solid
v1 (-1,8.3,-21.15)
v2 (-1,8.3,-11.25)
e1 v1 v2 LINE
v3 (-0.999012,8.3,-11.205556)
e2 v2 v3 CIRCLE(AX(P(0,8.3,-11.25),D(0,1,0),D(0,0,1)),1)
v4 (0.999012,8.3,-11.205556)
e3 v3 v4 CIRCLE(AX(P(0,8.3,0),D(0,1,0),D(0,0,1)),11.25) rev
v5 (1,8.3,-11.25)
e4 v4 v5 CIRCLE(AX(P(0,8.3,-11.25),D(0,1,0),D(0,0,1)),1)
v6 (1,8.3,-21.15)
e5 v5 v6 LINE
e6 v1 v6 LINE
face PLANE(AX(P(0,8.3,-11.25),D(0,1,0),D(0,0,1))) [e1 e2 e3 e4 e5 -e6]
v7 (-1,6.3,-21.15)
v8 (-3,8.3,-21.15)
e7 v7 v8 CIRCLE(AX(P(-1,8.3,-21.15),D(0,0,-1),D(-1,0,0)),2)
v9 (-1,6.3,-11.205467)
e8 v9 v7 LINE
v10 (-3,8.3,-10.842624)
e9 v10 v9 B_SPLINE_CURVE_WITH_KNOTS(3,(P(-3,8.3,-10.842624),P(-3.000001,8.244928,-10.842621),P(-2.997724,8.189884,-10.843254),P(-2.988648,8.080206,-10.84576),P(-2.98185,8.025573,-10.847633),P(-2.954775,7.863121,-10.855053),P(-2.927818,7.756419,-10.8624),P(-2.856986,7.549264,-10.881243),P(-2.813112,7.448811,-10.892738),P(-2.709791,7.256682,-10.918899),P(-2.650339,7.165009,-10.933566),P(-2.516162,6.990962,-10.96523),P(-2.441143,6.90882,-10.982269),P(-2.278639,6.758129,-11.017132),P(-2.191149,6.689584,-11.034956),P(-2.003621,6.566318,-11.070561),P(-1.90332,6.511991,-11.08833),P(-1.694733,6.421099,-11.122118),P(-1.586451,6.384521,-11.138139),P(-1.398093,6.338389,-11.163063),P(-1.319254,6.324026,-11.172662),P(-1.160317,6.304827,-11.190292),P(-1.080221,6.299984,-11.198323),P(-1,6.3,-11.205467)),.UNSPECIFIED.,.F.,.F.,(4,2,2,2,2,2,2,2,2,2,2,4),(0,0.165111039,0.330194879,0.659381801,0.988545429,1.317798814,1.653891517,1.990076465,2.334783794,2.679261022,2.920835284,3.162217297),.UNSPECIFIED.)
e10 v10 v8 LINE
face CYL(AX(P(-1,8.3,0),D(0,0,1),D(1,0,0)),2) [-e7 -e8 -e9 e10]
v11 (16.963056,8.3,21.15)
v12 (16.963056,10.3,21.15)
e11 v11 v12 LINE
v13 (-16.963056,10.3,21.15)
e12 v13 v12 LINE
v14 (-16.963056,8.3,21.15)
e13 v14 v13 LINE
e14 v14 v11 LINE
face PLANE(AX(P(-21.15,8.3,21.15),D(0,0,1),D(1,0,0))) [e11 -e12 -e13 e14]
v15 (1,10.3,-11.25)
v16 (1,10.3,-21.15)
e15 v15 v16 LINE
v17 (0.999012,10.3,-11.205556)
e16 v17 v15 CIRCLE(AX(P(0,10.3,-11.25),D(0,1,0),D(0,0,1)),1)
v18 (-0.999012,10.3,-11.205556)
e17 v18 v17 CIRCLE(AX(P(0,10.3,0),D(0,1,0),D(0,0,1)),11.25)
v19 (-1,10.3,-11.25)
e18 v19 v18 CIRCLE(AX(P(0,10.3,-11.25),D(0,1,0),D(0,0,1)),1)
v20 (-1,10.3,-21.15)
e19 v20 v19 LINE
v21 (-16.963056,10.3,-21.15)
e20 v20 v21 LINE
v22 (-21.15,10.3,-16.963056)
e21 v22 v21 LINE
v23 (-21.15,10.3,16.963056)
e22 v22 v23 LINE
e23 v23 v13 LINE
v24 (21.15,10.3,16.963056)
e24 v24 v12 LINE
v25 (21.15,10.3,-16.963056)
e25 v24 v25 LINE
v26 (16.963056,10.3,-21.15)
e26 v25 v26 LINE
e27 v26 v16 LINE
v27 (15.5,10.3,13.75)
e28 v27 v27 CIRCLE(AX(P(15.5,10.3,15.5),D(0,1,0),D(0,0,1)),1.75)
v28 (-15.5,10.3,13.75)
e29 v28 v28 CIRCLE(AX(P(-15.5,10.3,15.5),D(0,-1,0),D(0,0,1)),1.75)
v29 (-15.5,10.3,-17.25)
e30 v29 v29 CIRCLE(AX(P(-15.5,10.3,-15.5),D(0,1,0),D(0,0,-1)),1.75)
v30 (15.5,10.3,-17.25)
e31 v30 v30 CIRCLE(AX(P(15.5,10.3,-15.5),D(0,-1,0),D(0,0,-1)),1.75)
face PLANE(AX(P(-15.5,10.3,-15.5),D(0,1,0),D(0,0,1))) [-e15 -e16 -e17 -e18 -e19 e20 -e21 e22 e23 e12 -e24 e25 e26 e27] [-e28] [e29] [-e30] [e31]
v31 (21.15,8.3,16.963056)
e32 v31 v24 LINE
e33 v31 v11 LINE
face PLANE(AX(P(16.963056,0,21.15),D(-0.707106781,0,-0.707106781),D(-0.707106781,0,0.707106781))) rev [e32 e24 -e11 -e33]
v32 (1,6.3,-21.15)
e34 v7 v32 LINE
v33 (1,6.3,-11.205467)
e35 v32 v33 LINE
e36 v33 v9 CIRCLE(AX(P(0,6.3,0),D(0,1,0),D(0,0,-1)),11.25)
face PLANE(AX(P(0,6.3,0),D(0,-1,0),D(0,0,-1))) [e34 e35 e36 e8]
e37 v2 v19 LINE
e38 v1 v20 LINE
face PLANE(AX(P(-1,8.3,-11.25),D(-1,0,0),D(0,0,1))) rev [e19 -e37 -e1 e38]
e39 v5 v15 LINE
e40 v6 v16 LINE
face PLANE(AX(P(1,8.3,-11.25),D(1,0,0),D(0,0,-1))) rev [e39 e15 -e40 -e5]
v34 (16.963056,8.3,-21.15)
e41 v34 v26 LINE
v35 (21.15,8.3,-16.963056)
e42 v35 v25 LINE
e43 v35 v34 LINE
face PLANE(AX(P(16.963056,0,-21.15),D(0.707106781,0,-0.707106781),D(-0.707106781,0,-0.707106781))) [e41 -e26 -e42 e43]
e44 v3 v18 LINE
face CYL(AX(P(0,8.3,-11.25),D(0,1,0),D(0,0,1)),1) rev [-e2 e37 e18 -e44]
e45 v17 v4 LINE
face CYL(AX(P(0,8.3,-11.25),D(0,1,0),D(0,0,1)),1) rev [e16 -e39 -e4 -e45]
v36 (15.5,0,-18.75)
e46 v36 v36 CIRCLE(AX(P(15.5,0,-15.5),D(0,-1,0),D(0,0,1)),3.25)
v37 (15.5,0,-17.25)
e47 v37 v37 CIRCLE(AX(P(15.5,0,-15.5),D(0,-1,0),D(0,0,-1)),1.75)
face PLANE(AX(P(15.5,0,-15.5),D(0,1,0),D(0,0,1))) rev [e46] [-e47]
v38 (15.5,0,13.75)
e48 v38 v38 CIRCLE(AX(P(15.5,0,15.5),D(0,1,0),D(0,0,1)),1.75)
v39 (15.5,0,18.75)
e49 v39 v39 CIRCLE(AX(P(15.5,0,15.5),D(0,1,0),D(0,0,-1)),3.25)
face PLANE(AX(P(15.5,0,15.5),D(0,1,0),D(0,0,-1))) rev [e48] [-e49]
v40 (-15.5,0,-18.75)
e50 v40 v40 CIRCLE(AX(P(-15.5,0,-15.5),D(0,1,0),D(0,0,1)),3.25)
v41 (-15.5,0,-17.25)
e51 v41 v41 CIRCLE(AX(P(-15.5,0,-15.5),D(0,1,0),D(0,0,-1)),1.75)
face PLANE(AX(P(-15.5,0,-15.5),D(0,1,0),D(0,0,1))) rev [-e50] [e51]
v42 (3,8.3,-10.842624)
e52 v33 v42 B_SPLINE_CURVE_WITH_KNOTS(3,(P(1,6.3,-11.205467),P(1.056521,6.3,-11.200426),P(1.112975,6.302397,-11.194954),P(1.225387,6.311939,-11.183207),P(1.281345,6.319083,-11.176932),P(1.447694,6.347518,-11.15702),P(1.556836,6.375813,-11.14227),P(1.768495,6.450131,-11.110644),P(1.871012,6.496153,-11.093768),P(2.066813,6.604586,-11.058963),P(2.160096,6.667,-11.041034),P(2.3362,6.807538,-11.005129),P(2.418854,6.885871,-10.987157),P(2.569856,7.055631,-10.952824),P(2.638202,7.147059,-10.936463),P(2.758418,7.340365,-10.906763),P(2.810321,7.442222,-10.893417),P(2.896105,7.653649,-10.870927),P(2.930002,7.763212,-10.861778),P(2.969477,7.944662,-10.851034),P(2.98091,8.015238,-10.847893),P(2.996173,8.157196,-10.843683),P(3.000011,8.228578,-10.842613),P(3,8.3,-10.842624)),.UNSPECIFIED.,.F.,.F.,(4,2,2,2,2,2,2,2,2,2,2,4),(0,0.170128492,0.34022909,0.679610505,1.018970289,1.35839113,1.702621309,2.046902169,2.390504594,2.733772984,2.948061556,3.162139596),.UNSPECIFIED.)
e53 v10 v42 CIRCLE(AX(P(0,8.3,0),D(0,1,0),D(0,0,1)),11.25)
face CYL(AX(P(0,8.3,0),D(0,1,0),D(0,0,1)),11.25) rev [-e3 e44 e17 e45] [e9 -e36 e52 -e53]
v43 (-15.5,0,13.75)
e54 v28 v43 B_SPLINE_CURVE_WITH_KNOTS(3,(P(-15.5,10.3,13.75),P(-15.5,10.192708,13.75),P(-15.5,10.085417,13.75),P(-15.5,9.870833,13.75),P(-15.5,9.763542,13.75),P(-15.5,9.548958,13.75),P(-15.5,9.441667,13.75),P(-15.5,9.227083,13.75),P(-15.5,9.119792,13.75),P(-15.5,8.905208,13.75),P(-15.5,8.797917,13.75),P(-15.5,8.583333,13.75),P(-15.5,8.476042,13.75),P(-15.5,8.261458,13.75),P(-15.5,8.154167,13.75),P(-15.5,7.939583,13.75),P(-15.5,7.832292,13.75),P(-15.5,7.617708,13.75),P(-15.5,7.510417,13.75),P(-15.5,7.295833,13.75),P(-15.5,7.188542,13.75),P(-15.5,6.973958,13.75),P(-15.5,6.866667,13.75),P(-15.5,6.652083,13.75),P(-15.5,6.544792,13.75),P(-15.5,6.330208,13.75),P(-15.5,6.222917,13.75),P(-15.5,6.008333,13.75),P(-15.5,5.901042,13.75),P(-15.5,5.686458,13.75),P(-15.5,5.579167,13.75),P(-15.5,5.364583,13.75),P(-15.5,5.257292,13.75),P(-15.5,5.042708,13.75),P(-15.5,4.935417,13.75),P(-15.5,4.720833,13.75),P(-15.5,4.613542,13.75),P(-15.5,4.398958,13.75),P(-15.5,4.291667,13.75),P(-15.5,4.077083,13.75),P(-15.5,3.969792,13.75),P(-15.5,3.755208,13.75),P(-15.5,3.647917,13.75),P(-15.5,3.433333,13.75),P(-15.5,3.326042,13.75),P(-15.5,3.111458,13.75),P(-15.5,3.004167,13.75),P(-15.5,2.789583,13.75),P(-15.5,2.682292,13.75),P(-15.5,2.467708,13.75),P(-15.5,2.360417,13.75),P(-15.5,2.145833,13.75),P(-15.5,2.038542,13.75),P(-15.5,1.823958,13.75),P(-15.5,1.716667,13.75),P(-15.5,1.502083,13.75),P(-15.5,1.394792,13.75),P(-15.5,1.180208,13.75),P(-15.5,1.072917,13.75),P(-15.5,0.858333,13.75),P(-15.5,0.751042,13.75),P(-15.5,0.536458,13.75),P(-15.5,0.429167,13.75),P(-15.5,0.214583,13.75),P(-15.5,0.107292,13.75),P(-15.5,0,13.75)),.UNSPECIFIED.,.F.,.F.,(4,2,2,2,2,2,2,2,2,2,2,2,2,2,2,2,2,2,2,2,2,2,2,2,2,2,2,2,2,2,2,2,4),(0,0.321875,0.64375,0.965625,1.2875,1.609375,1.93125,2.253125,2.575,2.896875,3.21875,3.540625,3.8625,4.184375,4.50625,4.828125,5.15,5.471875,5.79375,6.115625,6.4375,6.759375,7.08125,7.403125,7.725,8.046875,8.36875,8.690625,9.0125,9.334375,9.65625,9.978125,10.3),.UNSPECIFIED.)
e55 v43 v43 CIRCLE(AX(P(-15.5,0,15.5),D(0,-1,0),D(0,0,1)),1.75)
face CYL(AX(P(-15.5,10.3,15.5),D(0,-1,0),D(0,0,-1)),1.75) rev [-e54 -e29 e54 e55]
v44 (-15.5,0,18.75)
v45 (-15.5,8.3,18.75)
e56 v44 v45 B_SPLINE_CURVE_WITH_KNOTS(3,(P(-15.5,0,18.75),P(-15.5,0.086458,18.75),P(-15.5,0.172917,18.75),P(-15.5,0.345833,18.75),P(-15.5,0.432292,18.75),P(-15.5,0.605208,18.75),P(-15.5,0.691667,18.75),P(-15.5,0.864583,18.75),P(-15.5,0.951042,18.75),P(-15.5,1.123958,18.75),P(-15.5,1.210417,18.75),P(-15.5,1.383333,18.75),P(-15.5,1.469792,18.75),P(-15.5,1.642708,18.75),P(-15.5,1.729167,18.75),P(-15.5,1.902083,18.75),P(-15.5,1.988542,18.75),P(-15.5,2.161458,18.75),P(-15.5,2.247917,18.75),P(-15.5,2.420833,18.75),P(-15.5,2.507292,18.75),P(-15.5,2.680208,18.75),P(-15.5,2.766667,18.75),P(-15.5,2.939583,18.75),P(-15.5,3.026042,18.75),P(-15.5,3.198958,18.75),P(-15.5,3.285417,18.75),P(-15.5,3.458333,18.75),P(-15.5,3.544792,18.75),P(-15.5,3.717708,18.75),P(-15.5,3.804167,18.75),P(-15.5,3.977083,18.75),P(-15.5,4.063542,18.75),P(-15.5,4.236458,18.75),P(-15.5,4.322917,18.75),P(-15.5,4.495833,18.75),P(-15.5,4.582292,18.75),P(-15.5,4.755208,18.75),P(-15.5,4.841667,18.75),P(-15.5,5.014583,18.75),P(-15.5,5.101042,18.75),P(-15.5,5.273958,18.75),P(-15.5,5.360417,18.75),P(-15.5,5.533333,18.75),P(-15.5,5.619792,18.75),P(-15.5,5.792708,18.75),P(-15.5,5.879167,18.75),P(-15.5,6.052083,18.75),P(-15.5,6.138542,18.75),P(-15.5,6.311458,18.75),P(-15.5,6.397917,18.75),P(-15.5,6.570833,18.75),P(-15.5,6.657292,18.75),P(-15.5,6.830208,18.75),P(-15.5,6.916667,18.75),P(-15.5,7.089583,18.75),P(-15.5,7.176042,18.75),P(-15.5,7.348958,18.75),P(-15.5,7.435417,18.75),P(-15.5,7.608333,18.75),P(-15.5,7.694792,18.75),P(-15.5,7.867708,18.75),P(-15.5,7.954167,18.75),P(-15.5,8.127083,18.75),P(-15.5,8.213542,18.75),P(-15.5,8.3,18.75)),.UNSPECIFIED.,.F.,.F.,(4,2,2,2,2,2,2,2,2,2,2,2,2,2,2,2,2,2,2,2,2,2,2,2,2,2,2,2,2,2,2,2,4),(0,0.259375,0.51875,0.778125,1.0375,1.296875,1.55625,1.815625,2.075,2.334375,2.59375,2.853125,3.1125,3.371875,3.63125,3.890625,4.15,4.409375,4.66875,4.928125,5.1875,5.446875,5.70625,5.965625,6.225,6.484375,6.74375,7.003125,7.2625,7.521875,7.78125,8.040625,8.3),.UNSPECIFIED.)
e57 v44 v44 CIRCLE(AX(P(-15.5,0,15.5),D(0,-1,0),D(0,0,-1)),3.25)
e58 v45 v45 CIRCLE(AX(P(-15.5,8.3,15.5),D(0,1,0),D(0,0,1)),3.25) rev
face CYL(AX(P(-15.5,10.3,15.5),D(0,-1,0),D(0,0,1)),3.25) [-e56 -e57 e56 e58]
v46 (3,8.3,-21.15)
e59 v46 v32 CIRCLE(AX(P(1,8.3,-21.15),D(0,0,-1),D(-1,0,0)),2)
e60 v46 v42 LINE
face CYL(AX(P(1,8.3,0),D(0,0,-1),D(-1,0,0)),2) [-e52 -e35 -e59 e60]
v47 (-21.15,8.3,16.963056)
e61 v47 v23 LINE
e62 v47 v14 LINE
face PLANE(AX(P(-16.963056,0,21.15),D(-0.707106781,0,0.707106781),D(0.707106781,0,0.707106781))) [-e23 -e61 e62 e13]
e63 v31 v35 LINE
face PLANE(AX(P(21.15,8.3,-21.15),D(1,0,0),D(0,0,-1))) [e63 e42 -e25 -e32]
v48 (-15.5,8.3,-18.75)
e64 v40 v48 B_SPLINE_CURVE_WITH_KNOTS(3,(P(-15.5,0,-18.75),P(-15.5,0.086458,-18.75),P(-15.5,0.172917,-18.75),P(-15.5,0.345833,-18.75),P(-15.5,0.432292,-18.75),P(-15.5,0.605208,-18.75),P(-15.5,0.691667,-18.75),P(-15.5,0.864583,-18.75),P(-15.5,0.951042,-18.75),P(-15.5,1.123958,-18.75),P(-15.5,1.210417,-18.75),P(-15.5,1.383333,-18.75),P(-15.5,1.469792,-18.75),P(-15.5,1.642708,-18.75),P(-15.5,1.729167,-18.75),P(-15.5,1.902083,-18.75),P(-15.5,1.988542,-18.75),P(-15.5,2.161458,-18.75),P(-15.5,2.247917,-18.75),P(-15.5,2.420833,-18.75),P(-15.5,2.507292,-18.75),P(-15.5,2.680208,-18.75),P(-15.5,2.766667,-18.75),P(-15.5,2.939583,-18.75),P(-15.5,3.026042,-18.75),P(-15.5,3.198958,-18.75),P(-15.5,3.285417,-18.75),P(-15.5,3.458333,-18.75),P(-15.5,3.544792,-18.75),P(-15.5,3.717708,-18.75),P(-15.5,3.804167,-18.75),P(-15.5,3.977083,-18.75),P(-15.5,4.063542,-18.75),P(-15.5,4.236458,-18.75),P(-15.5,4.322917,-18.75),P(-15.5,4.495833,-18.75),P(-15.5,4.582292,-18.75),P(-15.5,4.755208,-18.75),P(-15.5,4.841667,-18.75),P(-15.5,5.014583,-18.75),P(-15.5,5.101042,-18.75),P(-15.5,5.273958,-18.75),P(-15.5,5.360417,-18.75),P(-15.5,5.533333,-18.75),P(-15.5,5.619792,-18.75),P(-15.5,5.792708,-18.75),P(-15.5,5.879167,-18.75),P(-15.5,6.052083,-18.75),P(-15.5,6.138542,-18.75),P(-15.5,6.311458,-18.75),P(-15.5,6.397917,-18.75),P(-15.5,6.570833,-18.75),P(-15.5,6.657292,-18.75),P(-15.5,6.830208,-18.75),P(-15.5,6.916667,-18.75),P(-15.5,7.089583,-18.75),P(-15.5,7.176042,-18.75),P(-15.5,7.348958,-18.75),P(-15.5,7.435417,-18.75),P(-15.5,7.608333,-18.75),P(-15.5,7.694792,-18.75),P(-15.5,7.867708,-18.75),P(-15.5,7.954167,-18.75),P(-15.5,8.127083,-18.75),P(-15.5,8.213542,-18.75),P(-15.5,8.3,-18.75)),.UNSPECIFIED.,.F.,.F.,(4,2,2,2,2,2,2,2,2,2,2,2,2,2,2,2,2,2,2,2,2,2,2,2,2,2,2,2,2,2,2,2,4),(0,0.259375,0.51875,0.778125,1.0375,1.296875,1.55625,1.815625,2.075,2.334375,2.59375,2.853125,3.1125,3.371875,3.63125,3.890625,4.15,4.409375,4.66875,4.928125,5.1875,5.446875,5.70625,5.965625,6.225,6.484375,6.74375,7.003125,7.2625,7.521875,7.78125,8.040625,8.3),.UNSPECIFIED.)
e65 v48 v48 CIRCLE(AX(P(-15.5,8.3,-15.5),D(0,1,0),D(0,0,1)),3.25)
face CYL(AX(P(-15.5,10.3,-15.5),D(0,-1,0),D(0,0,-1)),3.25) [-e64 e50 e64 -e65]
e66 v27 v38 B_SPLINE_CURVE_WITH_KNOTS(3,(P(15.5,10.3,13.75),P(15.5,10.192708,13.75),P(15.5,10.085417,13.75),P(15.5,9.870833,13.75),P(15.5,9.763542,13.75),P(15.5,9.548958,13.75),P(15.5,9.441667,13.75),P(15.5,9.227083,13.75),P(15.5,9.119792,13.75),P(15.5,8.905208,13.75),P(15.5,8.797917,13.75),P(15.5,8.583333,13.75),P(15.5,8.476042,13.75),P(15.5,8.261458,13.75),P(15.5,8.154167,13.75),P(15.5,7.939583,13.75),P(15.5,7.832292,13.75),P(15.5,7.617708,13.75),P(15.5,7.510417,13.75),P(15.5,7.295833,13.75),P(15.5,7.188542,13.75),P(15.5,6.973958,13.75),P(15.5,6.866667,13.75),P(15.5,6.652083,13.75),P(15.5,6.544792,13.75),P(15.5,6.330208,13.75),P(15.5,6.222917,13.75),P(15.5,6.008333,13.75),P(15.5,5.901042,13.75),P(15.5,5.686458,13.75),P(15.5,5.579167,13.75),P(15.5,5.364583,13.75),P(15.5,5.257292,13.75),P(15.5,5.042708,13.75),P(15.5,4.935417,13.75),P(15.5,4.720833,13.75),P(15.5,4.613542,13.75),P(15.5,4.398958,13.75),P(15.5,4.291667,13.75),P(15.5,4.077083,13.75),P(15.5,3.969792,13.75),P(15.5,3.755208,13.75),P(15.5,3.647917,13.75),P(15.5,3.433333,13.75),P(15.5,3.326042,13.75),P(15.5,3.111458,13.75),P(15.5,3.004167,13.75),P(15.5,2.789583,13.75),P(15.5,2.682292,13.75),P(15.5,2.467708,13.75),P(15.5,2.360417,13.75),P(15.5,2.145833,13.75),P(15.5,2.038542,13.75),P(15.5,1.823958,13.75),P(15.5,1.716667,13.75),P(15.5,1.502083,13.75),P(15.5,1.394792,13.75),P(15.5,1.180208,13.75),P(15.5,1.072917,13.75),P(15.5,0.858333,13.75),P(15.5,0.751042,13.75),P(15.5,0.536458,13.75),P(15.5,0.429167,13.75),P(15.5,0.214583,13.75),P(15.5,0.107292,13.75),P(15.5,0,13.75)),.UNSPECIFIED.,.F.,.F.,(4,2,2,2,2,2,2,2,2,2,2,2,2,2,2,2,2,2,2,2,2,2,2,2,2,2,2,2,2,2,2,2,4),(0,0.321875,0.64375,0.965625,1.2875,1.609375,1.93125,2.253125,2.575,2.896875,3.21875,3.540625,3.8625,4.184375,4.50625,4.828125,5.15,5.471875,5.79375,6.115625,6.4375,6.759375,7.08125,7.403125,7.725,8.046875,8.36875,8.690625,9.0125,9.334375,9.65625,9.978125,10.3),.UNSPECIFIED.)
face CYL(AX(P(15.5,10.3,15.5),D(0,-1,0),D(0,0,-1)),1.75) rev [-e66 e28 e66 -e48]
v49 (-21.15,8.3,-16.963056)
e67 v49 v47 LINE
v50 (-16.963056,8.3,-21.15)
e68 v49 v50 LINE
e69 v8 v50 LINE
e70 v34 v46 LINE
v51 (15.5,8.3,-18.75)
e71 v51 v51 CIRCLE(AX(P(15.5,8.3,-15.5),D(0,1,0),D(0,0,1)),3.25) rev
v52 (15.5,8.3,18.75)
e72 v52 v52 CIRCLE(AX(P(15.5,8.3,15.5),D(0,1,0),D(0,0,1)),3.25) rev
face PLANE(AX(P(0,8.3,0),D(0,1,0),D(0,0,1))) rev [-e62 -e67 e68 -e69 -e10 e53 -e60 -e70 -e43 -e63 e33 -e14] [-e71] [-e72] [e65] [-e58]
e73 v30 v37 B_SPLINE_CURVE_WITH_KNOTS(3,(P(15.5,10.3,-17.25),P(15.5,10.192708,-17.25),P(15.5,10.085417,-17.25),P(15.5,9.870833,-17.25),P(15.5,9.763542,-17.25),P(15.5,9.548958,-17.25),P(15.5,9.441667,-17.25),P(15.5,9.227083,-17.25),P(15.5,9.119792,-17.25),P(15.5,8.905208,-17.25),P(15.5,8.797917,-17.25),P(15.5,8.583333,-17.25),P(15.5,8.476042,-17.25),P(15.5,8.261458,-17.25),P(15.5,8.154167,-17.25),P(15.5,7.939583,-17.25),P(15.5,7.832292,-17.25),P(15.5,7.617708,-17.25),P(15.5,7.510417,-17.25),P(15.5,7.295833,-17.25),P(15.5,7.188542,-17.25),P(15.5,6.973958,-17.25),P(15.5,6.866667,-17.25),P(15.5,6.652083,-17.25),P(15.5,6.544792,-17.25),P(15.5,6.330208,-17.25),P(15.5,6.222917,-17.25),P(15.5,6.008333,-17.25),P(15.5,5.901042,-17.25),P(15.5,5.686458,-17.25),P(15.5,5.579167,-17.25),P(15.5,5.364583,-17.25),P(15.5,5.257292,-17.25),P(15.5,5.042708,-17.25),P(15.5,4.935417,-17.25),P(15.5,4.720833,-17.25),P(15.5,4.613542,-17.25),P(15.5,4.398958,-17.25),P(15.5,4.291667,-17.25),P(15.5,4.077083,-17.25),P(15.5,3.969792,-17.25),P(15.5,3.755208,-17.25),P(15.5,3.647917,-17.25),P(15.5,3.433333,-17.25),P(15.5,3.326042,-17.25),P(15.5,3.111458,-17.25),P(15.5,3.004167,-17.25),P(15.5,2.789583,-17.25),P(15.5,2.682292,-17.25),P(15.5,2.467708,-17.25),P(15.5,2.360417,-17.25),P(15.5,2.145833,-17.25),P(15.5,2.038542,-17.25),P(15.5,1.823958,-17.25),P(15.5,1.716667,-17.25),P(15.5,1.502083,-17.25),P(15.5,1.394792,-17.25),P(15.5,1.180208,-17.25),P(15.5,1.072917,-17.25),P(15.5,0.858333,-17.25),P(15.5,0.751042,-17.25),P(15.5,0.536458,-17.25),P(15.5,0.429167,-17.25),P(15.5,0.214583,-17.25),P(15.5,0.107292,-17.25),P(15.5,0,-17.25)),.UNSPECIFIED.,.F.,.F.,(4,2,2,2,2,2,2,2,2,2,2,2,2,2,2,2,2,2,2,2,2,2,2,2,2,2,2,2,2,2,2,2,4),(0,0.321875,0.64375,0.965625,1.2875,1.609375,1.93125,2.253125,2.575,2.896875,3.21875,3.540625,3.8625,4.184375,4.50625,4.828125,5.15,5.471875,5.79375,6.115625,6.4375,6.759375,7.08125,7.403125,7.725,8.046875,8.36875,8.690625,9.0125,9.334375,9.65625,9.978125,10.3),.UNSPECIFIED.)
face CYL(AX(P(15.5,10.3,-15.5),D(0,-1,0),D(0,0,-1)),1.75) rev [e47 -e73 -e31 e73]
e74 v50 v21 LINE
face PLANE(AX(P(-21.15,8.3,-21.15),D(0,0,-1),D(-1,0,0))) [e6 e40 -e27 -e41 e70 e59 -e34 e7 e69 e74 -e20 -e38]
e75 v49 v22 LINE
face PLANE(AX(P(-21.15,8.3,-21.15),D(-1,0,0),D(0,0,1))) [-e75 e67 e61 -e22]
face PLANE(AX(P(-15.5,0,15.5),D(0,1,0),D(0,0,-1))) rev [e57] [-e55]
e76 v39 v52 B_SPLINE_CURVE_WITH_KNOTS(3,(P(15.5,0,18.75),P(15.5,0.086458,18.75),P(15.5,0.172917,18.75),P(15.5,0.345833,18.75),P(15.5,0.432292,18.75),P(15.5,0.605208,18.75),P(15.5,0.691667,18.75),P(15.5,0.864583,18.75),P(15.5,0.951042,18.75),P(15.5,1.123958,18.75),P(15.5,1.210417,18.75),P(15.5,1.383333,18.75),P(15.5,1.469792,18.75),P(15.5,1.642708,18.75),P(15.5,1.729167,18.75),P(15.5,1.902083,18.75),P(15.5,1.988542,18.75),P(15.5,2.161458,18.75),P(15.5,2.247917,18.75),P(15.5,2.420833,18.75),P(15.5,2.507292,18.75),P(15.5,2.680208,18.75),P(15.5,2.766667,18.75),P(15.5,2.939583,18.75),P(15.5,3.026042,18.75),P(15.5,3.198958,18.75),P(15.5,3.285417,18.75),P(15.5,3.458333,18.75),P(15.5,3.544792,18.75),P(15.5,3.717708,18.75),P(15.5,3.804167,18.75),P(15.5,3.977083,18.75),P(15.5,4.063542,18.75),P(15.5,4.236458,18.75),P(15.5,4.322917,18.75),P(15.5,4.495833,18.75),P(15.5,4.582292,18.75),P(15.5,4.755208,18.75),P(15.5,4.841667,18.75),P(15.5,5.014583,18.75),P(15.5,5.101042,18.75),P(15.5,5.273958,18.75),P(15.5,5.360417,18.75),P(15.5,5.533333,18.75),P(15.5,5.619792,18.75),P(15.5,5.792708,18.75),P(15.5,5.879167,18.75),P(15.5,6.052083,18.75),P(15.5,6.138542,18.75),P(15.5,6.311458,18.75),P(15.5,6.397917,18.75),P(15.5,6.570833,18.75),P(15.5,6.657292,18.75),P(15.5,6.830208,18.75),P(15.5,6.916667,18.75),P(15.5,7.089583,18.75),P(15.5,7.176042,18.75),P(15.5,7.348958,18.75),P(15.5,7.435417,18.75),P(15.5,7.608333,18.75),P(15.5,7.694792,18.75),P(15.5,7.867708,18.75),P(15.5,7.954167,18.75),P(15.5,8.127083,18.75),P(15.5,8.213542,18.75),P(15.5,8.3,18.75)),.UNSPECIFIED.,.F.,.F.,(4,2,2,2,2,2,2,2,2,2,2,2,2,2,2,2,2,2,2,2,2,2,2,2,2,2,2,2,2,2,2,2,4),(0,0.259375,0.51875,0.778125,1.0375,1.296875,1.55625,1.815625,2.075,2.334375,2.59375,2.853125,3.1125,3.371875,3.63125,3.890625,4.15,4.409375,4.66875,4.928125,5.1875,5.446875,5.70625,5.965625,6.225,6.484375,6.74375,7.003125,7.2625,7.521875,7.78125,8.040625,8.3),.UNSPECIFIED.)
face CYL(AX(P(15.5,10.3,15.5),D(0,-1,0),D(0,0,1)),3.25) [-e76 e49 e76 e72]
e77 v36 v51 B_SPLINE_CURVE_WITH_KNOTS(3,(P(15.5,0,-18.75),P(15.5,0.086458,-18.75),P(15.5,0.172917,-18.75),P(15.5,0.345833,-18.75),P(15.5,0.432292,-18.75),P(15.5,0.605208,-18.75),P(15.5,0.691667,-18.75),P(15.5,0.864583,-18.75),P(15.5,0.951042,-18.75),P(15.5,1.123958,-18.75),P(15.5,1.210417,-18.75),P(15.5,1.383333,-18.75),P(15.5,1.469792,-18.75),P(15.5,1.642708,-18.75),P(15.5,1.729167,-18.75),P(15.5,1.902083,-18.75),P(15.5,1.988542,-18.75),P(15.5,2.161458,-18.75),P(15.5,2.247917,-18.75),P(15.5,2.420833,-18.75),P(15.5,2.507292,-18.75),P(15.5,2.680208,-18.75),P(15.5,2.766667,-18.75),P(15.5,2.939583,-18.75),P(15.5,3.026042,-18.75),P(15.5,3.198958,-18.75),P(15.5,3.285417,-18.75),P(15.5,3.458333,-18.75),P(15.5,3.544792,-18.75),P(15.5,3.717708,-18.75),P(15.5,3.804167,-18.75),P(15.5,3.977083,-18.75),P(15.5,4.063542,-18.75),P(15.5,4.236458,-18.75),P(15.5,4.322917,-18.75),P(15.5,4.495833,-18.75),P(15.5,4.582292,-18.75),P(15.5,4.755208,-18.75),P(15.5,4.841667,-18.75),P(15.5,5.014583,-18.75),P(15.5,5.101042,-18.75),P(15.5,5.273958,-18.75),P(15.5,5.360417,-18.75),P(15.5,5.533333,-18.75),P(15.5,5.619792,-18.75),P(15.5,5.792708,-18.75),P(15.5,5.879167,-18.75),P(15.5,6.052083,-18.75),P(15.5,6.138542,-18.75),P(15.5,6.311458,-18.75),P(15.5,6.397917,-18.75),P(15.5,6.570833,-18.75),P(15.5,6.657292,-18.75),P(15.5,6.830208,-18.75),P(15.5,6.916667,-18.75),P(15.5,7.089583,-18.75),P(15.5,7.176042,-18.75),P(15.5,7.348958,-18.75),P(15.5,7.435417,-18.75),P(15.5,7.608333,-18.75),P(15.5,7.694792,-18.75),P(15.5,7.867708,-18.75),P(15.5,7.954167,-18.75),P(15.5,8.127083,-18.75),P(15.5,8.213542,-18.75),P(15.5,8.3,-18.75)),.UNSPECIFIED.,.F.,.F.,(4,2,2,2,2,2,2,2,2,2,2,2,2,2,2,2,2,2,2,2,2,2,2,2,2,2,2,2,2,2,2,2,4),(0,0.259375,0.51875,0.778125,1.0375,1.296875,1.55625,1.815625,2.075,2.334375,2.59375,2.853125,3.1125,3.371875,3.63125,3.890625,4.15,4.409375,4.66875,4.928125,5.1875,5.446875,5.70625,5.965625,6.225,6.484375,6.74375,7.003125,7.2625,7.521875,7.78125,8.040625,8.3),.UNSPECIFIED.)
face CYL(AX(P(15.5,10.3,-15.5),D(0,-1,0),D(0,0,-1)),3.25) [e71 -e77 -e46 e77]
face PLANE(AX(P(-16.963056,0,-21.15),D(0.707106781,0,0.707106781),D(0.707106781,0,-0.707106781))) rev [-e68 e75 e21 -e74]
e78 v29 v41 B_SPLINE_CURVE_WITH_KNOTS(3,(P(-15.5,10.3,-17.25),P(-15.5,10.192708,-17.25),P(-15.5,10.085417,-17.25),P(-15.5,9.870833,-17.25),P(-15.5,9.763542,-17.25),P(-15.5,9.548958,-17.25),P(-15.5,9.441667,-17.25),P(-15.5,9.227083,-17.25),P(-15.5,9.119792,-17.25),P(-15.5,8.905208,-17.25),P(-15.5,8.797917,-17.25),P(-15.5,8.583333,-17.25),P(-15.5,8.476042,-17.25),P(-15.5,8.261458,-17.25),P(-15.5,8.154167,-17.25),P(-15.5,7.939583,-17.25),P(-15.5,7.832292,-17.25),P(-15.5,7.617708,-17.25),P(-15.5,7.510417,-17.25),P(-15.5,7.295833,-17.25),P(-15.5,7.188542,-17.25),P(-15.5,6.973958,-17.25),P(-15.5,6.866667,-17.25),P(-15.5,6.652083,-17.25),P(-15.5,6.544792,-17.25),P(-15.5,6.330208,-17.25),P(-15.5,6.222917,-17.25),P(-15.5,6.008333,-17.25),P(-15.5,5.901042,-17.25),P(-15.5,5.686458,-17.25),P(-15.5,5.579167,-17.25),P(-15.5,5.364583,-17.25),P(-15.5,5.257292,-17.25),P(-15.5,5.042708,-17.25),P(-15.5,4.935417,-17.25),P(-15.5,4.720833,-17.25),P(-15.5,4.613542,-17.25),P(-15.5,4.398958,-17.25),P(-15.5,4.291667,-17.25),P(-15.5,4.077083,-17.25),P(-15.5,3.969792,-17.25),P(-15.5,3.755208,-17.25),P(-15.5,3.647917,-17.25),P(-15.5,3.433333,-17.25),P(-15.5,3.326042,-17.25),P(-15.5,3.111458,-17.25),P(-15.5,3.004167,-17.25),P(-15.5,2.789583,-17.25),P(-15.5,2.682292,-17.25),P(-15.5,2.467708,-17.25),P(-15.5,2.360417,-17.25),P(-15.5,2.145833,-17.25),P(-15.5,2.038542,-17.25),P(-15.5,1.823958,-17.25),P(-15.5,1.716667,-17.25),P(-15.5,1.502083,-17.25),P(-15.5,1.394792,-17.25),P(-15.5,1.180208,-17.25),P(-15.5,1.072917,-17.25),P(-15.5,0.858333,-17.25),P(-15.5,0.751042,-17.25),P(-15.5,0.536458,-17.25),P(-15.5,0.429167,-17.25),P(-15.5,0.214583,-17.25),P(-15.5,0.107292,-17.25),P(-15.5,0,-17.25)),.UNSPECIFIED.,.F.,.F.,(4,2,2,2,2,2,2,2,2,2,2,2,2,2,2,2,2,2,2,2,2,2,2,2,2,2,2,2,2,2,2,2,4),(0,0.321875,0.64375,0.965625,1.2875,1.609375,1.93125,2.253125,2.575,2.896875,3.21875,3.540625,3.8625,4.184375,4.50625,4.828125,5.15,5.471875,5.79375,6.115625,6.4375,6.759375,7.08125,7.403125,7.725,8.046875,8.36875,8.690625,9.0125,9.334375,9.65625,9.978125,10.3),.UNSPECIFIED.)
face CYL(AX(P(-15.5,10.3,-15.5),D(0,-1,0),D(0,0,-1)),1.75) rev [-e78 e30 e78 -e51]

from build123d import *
from build123d.topology import SkipClean

# Parameters (mm, degrees)
SKETCH1_R               = 3.25
BOSS_EXTRUDE1_DEPTH     = 10.3
SKETCH2_W               = 42.3
SKETCH2_H               = 42.3
SKETCH2_R               = 11.25
BOSS_EXTRUDE2_DEPTH     = 2
CUT_EXTRUDE1_DEPTH      = 32.634395837
SKETCH4_R               = 1.75
CUT_EXTRUDE2_DEPTH      = 32.634395837
MIRROR6_COPY_1_SKETCH_R = 1.75
MIRROR6_COPY_1_DEPTH    = 32.634395837
BOSS_EXTRUDE3_DEPTH     = 2
CUT_EXTRUDE3_DEPTH      = 2
FILLET1_R               = 2


with BuildPart() as part:
    # Sketch1 → Boss-Extrude1 (new body)
    with BuildSketch(Plane(origin=(0, 0, 0), x_dir=(1, 0, 0), z_dir=(0, 1, 0))):
        with Locations(Location((-15.5, 15.5, 0), (0, 0, 90))):
            Circle(SKETCH1_R)
    extrude(amount=BOSS_EXTRUDE1_DEPTH)


with BuildPart() as body_2:
    # Mirror2: mirrored copy
    add(part.part.mirror(Plane(origin=(0, 0, 0), x_dir=(0, 0, 1), z_dir=(1, 0, 0))))


with BuildPart() as body_3:
    # Mirror3: mirrored copy
    add(part.part.mirror(Plane.XY))


with BuildPart() as body_4:
    # Mirror3 2: mirrored copy
    add(body_2.part.mirror(Plane.XY))


with BuildPart() as part_1:
    add(part.part)

    add(body_2.part)  # Boss-Extrude2 merges body 2

    add(body_3.part)  # Boss-Extrude2 merges body 3

    add(body_4.part)  # Boss-Extrude2 merges body 4
    # Sketch2 → Boss-Extrude2 (add)
    with BuildSketch(Plane(origin=(0, 10.3, 0), x_dir=(1, 0, 0), z_dir=(0, 1, 0))):
        Rectangle(SKETCH2_W, SKETCH2_H)
        with Locations(Location((0, 0, 0), (0, 0, 270))):
            Circle(SKETCH2_R, mode=Mode.SUBTRACT)
    extrude(amount=-BOSS_EXTRUDE2_DEPTH)

    # Sketch3 → Cut-Extrude1 (cut, through all)
    with BuildSketch(Plane(origin=(0, 10.3, 0), x_dir=(1, 0, 0), z_dir=(0, 1, 0))):
        Polygon((-16.963055506, 21.15), (-21.15, 16.963055506), (-21.15, 21.15), align=None)
        Polygon((16.963055506, -21.15), (21.15, -16.963055506), (21.15, -21.15), align=None)
    cut_extrude1 = extrude(amount=-CUT_EXTRUDE1_DEPTH, mode=Mode.SUBTRACT)

    # Mirror4: Cut-Extrude1 across plane
    add(cut_extrude1.mirror(Plane.XY), mode=Mode.SUBTRACT)

    # Sketch4 → Cut-Extrude2 (cut, through all)
    with BuildSketch(Plane.XZ):
        with Locations(Location((15.5, -15.5, 0), (0, 0, 270))):
            Circle(SKETCH4_R)
    cut_extrude2 = extrude(amount=-CUT_EXTRUDE2_DEPTH, mode=Mode.SUBTRACT)

    # Mirror5: Cut-Extrude2 across plane
    add(cut_extrude2.mirror(Plane(origin=(0, 0, 0), x_dir=(0, 0, 1), z_dir=(1, 0, 0))), mode=Mode.SUBTRACT)

    # Mirror6: Cut-Extrude2 across plane
    add(cut_extrude2.mirror(Plane.XY), mode=Mode.SUBTRACT)

    # Mirror6 copy 1 sketch → Mirror6 copy 1 (cut, through all)
    with BuildSketch(Plane(origin=(0, 0, 0), x_dir=(-1, 0, 0), z_dir=(0, -1, 0))):
        with Locations(Location((15.5, -15.5, 0), (0, 0, 270))):
            Circle(MIRROR6_COPY_1_SKETCH_R)
    extrude(amount=-MIRROR6_COPY_1_DEPTH, mode=Mode.SUBTRACT)

    # Sketch6 → Boss-Extrude3 (add)
    with SkipClean():  # the faces are left unmerged after this step: merging them gives an invalid solid
        with BuildSketch(Plane.XZ.offset(-8.3)):
            with BuildLine():
                Line((-3, -21.15), (-3, -10.842624221))
                ThreePointArc((-3, -10.842624221), (0, -11.25), (3, -10.842624221))
                Line((3, -10.842624221), (3, -21.15))
                Line((3, -21.15), (-3, -21.15))
            make_face()
        extrude(amount=BOSS_EXTRUDE3_DEPTH)

    # Sketch7 → Cut-Extrude3 (cut)
    with SkipClean():  # the faces are left unmerged after this step: merging them gives an invalid solid
        with BuildSketch(Plane(origin=(0, 10.3, 0), x_dir=(1, 0, 0), z_dir=(0, 1, 0))):
            with BuildLine():
                Line((-1, 11.25), (-1, 21.15))
                ThreePointArc((-1, 21.15), (0, 22.15), (1, 21.15))
                Line((1, 21.15), (1, 11.25))
                ThreePointArc((1, 11.25), (0, 10.25), (-1, 11.25))
            make_face()
        extrude(amount=-CUT_EXTRUDE3_DEPTH, mode=Mode.SUBTRACT)

    # Fillet1
    fillet1_edges = [part_1.edges().sort_by_distance(p)[0] for p in [
        (3, 6.3, -15.996312111),
        (-3, 6.3, -15.996312111),
    ]]
    fillet(fillet1_edges, radius=FILLET1_R - 0.0001)  # a hair under: the kernel refuses the full size


solid = part_1.part
